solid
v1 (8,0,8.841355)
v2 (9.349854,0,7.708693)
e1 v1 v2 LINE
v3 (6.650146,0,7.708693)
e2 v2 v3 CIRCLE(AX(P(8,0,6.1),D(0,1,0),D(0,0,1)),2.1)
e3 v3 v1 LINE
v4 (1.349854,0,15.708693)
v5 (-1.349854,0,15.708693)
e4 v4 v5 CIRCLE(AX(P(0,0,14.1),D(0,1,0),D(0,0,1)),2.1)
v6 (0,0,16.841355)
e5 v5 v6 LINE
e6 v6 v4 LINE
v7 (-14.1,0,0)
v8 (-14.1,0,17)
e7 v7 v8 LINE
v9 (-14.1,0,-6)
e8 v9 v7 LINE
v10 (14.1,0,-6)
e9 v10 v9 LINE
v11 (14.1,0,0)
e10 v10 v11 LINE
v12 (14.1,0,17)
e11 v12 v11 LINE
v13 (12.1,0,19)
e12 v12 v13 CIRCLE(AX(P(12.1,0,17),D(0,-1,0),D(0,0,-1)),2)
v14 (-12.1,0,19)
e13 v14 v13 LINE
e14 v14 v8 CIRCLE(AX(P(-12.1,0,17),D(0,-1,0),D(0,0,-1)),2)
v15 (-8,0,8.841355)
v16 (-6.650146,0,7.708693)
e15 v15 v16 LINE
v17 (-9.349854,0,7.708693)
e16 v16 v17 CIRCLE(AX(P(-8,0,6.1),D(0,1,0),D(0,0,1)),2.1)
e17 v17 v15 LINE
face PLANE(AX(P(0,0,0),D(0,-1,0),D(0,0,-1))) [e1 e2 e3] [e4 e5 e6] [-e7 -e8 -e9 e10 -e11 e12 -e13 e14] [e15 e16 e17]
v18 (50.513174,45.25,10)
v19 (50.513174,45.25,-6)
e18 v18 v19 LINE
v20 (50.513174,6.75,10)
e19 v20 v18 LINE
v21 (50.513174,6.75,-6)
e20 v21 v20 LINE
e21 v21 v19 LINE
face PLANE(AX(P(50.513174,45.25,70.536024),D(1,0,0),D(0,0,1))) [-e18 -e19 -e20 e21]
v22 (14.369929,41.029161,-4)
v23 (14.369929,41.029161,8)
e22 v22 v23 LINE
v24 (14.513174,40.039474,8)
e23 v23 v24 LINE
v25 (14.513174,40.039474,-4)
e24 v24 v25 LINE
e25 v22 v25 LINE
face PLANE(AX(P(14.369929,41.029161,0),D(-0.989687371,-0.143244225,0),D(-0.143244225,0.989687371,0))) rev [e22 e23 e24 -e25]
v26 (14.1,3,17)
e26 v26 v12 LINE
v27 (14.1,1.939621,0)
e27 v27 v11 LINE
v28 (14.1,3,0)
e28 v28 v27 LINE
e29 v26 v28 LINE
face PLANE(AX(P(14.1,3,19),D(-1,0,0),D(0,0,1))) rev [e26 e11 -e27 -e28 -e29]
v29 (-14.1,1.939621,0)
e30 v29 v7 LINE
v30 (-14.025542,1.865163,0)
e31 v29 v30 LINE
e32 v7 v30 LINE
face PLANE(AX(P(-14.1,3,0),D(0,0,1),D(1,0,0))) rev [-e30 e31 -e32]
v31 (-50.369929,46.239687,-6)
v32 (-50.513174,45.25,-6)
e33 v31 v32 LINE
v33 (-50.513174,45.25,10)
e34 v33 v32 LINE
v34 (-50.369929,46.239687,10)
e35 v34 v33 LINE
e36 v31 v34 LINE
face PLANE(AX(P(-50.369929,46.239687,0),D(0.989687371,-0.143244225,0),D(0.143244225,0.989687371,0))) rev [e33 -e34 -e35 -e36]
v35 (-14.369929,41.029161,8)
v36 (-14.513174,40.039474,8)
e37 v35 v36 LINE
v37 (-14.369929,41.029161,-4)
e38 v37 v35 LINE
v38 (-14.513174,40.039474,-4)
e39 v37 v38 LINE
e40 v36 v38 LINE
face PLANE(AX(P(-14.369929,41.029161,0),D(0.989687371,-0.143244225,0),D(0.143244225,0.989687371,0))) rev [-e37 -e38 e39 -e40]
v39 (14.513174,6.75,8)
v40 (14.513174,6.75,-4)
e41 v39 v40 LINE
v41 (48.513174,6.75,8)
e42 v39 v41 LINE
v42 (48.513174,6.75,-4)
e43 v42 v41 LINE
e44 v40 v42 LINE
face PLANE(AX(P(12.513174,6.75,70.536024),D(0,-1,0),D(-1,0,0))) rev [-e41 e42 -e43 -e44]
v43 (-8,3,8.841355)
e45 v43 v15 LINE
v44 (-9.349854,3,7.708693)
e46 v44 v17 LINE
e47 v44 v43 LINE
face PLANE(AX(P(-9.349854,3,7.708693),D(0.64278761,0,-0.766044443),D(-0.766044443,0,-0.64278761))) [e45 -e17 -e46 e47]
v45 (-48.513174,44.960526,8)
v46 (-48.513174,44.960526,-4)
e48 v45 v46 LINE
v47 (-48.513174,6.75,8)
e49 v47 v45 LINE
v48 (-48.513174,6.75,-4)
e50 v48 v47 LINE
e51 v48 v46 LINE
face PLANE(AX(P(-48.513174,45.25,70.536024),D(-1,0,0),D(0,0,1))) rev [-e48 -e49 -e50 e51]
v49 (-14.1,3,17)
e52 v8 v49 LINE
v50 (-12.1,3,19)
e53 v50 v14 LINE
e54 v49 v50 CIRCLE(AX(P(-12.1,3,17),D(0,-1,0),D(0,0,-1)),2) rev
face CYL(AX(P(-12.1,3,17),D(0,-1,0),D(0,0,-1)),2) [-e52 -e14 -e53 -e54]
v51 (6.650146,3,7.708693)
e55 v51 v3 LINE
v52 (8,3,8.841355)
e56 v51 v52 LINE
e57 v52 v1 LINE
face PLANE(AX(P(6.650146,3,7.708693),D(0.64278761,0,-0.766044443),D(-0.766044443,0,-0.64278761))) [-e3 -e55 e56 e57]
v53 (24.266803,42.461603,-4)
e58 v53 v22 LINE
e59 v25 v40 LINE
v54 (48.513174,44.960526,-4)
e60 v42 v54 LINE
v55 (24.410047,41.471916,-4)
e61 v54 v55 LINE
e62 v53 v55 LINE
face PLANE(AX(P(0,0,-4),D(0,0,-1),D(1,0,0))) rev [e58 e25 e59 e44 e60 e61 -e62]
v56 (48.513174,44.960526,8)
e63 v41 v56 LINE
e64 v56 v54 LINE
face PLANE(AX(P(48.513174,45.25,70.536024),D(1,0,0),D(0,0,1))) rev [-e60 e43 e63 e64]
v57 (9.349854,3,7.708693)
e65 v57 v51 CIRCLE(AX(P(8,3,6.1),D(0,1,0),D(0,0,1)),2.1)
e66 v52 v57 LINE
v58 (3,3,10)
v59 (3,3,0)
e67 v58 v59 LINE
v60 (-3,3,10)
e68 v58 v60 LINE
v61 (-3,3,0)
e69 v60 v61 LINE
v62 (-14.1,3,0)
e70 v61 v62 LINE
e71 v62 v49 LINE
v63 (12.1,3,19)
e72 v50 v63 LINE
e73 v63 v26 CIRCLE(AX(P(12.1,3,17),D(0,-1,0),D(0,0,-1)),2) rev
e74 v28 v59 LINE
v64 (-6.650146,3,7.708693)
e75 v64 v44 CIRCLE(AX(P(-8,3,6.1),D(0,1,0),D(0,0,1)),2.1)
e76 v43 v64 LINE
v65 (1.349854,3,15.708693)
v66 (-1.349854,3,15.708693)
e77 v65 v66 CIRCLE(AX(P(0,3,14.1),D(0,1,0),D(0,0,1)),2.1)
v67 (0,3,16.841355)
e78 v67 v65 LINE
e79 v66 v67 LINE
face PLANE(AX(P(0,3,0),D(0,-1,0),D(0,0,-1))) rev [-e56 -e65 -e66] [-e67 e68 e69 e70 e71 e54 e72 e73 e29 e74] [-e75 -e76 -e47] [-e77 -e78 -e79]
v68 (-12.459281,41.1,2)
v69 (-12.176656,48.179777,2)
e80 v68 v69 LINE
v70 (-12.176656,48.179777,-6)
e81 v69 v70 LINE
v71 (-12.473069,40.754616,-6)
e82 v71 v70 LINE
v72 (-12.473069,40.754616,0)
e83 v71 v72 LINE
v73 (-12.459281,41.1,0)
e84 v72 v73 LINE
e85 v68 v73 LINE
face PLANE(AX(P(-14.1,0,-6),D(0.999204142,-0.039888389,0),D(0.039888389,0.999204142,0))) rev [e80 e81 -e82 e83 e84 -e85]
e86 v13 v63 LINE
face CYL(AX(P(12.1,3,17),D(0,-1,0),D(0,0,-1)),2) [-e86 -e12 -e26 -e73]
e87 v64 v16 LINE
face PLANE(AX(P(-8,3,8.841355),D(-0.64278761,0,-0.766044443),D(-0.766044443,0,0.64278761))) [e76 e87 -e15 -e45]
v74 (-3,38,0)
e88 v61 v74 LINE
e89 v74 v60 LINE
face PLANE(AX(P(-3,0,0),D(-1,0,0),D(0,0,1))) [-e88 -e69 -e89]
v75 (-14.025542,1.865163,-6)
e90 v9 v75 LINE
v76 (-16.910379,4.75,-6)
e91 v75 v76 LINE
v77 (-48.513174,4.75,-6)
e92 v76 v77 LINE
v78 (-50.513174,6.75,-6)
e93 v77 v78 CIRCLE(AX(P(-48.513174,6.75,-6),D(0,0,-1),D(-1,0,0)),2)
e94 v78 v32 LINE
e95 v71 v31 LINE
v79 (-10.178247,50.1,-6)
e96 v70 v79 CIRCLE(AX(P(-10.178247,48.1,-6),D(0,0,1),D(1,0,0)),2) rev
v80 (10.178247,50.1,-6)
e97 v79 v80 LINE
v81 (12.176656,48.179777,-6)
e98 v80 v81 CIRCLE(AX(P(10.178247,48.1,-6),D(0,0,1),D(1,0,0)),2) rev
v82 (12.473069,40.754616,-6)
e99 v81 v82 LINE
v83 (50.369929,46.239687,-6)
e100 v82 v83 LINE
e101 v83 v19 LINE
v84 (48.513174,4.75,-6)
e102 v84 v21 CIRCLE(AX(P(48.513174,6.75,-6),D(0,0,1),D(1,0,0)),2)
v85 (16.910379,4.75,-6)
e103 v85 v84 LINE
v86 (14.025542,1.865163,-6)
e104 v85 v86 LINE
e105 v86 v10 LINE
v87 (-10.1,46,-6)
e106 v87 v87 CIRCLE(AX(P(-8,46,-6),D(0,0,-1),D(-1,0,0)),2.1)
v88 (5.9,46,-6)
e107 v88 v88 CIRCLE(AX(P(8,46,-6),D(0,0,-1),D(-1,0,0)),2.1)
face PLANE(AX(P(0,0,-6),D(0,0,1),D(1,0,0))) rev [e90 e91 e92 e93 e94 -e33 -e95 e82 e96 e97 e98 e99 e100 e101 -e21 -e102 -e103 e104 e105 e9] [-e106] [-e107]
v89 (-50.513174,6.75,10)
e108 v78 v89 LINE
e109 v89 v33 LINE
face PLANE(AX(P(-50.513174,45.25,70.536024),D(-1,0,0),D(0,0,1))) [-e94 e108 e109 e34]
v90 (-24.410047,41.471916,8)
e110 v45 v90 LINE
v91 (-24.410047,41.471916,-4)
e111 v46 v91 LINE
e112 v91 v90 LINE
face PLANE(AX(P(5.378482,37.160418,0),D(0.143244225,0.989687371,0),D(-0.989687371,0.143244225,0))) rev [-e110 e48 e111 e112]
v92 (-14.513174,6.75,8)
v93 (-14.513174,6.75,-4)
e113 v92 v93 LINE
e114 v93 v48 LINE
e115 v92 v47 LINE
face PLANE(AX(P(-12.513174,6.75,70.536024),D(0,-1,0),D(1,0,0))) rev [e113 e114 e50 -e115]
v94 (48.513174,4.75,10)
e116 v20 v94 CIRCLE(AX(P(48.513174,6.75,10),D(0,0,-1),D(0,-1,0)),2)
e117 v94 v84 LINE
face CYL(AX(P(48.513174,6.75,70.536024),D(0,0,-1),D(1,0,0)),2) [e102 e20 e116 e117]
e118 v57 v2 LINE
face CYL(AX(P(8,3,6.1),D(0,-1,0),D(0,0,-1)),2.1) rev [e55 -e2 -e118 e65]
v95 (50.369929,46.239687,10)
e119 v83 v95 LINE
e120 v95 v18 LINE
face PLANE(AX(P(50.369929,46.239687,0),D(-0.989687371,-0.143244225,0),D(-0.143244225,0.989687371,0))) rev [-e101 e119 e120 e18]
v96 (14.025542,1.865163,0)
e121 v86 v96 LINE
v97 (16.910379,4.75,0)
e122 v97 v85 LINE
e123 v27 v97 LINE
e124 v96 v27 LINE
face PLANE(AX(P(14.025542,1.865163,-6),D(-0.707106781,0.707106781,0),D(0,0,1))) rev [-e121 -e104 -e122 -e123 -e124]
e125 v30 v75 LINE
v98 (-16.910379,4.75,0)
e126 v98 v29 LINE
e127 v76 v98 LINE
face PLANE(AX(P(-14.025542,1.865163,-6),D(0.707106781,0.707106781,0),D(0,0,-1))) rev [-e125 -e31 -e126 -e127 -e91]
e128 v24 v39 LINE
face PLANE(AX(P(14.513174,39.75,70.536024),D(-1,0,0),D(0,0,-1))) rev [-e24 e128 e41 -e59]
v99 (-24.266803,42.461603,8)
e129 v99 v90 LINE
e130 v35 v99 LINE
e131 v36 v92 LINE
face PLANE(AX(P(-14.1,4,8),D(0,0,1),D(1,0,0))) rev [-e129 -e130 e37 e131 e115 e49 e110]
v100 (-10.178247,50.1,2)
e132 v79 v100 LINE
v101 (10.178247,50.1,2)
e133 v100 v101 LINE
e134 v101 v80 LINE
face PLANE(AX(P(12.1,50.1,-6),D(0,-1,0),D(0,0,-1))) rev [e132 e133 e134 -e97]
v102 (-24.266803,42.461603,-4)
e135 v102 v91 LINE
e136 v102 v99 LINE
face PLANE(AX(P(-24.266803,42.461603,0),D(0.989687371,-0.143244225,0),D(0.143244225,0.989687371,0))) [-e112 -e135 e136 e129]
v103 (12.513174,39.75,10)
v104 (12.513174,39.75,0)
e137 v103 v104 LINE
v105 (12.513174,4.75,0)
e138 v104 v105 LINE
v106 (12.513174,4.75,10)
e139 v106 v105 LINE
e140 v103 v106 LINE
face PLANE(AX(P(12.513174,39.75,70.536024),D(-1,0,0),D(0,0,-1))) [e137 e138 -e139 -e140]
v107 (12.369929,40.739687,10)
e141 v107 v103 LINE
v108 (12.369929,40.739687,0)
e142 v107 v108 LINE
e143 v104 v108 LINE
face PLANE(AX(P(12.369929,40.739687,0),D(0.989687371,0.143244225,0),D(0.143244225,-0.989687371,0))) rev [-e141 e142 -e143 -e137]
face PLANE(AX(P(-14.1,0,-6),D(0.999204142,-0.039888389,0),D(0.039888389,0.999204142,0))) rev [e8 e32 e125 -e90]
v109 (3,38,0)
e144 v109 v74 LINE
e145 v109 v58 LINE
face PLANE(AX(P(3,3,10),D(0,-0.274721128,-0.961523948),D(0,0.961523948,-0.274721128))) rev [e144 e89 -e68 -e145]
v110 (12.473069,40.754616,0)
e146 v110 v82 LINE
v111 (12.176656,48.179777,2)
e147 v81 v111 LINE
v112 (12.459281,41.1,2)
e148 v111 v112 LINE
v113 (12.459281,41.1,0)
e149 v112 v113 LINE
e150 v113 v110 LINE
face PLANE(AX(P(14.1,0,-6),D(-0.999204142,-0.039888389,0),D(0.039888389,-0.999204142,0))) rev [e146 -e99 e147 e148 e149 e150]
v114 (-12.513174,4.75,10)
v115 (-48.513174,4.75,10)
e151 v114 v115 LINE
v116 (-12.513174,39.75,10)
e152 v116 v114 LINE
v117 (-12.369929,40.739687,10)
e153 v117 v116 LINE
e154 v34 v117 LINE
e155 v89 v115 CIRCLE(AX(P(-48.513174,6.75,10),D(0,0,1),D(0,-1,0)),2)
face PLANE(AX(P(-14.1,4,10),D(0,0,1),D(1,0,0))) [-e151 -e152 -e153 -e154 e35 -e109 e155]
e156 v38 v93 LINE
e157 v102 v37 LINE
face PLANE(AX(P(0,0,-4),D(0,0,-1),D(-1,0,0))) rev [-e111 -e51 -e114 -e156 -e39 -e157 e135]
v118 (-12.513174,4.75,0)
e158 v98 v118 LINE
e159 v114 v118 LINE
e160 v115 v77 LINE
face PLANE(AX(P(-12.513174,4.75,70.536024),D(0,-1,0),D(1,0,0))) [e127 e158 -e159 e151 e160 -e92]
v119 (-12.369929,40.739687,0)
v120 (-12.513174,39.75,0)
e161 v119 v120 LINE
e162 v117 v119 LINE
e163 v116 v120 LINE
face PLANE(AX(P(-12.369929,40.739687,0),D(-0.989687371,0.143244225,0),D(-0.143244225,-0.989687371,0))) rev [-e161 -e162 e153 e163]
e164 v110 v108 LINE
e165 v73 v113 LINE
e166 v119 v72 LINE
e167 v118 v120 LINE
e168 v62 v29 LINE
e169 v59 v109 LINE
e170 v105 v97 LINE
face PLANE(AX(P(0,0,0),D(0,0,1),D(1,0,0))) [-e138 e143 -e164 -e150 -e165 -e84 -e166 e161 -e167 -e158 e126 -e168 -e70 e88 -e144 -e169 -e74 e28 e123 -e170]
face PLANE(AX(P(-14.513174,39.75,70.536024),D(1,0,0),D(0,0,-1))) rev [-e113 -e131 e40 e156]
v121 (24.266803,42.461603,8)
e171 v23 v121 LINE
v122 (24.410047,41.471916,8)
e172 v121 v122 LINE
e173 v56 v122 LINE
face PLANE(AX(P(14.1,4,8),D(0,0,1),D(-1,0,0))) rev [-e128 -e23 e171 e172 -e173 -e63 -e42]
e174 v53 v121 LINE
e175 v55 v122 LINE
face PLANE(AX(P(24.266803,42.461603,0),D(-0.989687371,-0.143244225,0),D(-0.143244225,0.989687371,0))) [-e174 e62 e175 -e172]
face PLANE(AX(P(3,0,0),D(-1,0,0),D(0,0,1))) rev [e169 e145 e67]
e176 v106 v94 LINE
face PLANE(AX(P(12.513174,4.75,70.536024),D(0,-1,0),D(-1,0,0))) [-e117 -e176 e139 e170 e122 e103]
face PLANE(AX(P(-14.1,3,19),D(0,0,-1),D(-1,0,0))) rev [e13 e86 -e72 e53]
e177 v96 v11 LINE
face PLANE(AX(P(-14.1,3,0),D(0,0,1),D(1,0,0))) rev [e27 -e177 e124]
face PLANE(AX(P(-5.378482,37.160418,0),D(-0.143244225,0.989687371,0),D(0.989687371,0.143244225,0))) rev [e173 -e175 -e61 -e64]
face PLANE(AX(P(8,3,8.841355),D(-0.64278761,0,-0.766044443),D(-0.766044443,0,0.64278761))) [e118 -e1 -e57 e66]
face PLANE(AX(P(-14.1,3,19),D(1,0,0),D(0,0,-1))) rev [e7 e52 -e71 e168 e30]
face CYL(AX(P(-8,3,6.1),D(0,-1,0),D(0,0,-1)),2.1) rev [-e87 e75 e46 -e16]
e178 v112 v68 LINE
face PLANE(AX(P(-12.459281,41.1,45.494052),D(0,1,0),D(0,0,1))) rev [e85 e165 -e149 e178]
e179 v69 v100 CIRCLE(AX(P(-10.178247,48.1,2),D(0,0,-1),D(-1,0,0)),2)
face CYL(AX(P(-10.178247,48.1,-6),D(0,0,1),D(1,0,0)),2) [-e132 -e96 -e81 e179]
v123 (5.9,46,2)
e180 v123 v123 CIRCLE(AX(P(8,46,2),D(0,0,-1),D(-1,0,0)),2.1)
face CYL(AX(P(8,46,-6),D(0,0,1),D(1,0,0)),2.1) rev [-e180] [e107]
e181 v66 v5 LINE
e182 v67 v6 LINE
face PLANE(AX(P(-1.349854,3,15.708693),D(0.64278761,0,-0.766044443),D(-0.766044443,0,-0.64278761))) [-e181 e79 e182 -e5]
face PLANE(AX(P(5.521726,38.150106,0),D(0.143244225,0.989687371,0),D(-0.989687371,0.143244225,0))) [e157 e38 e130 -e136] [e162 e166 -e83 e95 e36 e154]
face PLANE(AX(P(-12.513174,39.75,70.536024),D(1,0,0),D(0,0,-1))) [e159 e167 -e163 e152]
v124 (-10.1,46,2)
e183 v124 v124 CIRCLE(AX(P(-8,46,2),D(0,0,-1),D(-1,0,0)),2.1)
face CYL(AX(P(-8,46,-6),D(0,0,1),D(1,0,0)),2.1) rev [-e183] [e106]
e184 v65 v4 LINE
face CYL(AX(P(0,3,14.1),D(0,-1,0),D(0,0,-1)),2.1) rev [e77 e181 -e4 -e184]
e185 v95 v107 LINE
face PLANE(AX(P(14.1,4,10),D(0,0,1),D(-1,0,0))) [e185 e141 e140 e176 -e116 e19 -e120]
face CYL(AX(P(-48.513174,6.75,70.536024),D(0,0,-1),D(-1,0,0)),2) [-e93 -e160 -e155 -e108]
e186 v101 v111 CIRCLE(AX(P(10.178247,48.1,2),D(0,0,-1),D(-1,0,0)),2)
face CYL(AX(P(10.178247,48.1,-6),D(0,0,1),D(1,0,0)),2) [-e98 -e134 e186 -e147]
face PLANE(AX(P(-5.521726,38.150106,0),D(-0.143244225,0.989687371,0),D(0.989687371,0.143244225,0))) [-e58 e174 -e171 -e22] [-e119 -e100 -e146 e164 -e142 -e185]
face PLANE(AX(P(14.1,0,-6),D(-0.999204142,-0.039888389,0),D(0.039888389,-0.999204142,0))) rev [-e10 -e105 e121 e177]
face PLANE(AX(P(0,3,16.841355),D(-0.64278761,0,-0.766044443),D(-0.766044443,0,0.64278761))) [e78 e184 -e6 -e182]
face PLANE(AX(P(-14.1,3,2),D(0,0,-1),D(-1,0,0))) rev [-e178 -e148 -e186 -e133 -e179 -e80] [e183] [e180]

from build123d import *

# Parameters (mm, degrees)
SKETCH1_W           = 28.2
SKETCH1_H           = 19
BOSS_EXTRUDE1_DEPTH = 3
SKETCH2_R           = 2.1
BOSS_EXTRUDE2_DEPTH = 6
BOSS_EXTRUDE3_DEPTH = 3
FILLET1_R           = 2
SKETCH4_R           = 2.1
BOSS_EXTRUDE4_DEPTH = 2
BOSS_EXTRUDE5_DEPTH = 16
FILLET2_R           = 2
SHELL1_START        = -4
SHELL1_DEPTH        = 12
SKETCH6_W           = 38.395963329
SKETCH6_H           = 16
SKETCH6_W_2         = 34.354282979
SKETCH6_H_2         = 12
SKETCH6_W_3         = 24.354282979
BOSS_EXTRUDE6_DEPTH = 1
CHAMFER1_SIZE       = 2.887134603
CHAMFER1_SIZE_2     = 3


with BuildPart() as part:
    # Sketch1 → Boss-Extrude1 (new body)
    with BuildSketch(Plane(origin=(0, 0, 0), x_dir=(1, 0, 0), z_dir=(0, 1, 0))):
        with Locations((0, -9.5)):
            Rectangle(SKETCH1_W, SKETCH1_H)
        with BuildLine():
            Line((-9.34985398, -7.708693331), (-8, -8.841355308))
            Line((-8, -8.841355308), (-6.65014602, -7.708693331))
            ThreePointArc((-6.65014602, -7.708693331), (-8, -4), (-9.34985398, -7.708693331))
        make_face(mode=Mode.SUBTRACT)
        with BuildLine():
            Line((-1.34985398, -15.708693331), (0, -16.841355308))
            Line((0, -16.841355308), (1.34985398, -15.708693331))
            ThreePointArc((1.34985398, -15.708693331), (0, -12), (-1.34985398, -15.708693331))
        make_face(mode=Mode.SUBTRACT)
        with BuildLine():
            Line((6.65014602, -7.708693331), (8, -8.841355308))
            Line((8, -8.841355308), (9.34985398, -7.708693331))
            ThreePointArc((9.34985398, -7.708693331), (8, -4), (6.65014602, -7.708693331))
        make_face(mode=Mode.SUBTRACT)
    extrude(amount=BOSS_EXTRUDE1_DEPTH)

    # Sketch2 → Boss-Extrude2 (add)
    with BuildSketch(Plane(origin=(0, 0, 0), x_dir=(-1, 0, 0), z_dir=(0, 0, -1))):
        Polygon((-14.1, 0), (14.1, 0), (12.1, 50.1), (-12.1, 50.1), align=None)
        with Locations((-8, 46)):
            Circle(SKETCH2_R, mode=Mode.SUBTRACT)
        with Locations((8, 46)):
            Circle(SKETCH2_R, mode=Mode.SUBTRACT)
    extrude(amount=BOSS_EXTRUDE2_DEPTH)

    # Sketch3 → Boss-Extrude3 (add, symmetric)
    with BuildSketch(Plane(origin=(0, 0, 0), x_dir=(0, 0, -1), z_dir=(1, 0, 0))):
        Polygon((0, 3), (-10, 3), (0, 38), align=None)
    extrude(amount=BOSS_EXTRUDE3_DEPTH, both=True)

    # Fillet1
    fillet1_edges = [part.edges().sort_by_distance(p)[0] for p in [
        (12.1, 50.1, -3),
        (-12.1, 50.1, -3),
        (14.1, 1.5, 19),
        (-14.1, 1.5, 19),
    ]]
    fillet(fillet1_edges, radius=FILLET1_R)

    # Sketch4 → Boss-Extrude4 (add)
    with BuildSketch(Plane.XY):
        with BuildLine():
            Line((-10.178247335, 50.1), (10.178247335, 50.1))
            ThreePointArc((10.178247335, 50.1), (11.563968527, 49.54214312), (12.176655618, 48.179776778))
            Line((12.176655618, 48.179776778), (12.459281437, 41.1))
            Line((12.459281437, 41.1), (-12.459281437, 41.1))
            Line((-12.459281437, 41.1), (-12.176655618, 48.179776778))
            ThreePointArc((-12.176655618, 48.179776778), (-11.563968527, 49.54214312), (-10.178247335, 50.1))
        make_face()
        with Locations(Location((-8, 46, 0), (0, 0, 180))):
            Circle(SKETCH4_R, mode=Mode.SUBTRACT)
        with Locations(Location((8, 46, 0), (0, 0, 180))):
            Circle(SKETCH4_R, mode=Mode.SUBTRACT)
    extrude(amount=BOSS_EXTRUDE4_DEPTH)


with BuildPart() as body_2:
    # Sketch5 → Boss-Extrude5 (new body)
    with BuildSketch(Plane(origin=(0, 0, -6), x_dir=(-1, 0, 0), z_dir=(0, 0, -1))):
        Polygon((12.513173653, 39.75), (50.513173653, 45.25), (50.513173653, 4.75), (12.513173653, 4.75), align=None)
    extrude(amount=-BOSS_EXTRUDE5_DEPTH)

    # Fillet2
    fillet2_edges = [body_2.edges().sort_by_distance(p)[0] for p in [
        (-50.513173653, 4.75, 2),
    ]]
    fillet(fillet2_edges, radius=FILLET2_R)

    # Shell1: read off the stored shape, not the designer's step
    # Shell1 outline → Shell1 (cut)
    with BuildSketch(Plane.XY.offset(SHELL1_START)):
        Polygon((-48.513173653, 44.960526316), (-48.513173653, 6.75), (-14.513173653, 6.75), (-14.513173653, 40.039473684), align=None)
    extrude(amount=SHELL1_DEPTH, mode=Mode.SUBTRACT)

    # Sketch6 → Boss-Extrude6 (add)
    # profile 1 of 2: a face of its own
    with BuildSketch(Plane(origin=(5.378481599, 37.160418319, 0), x_dir=(0.9896873708806833, -0.14324422473273113, 0), z_dir=(0.14324422473273113, 0.9896873708806833, 0))):
        with Locations((-37.276069531, -2)):
            Rectangle(SKETCH6_W, SKETCH6_H)
        with Locations((-37.276069531, -2)):
            Rectangle(SKETCH6_W_2, SKETCH6_H_2, mode=Mode.SUBTRACT)
    # profile 2 of 2: a face of its own
    with BuildSketch(Plane(origin=(5.378481599, 37.160418319, 0), x_dir=(0.9896873708806833, -0.14324422473273113, 0), z_dir=(0.14324422473273113, 0.9896873708806833, 0))):
        with Locations((-42.276069531, -2)):
            Rectangle(SKETCH6_W_3, SKETCH6_H_2)
    extrude(amount=BOSS_EXTRUDE6_DEPTH)


with BuildPart() as body_3:
    # Mirror2: mirrored copy
    add(body_2.part.mirror(Plane(origin=(0, 0, 0), x_dir=(0, 0, 1), z_dir=(1, 0, 0))))


with BuildPart() as part_1:
    add(part.part)

    # Combine1: read off the stored shape, not the designer's step
    # Combine1: union body 3, body 2
    add(body_3.part)
    add(body_2.part)

    # Chamfer1
    # the kernel refuses this chamfer: 3, 2.887134603 mm, written as the material it adds along each edge
    with BuildSketch(Plane(origin=(-13.910379242, 4.75, -6), x_dir=(-0.039888388883066415, -0.9992041415207972, 0), z_dir=(0, 0, 1))) as chamfer1_piece_1:
        Polygon((CHAMFER1_SIZE, 0), (CHAMFER1_SIZE_2 * 0.0398883888831, -CHAMFER1_SIZE_2 * 0.999204141521), (0, 0), align=None)
    extrude(amount=6)
    with BuildSketch(Plane(origin=(13.910379242, 4.75, -6), x_dir=(0.039888388883066304, -0.9992041415207972, 0), z_dir=(0, 0, 1))) as chamfer1_piece_2:
        Polygon((CHAMFER1_SIZE, 0), (CHAMFER1_SIZE_2 * 0.0398883888831, CHAMFER1_SIZE_2 * 0.999204141521), (0, 0), align=None)
    extrude(amount=6)


solid = part_1.part
